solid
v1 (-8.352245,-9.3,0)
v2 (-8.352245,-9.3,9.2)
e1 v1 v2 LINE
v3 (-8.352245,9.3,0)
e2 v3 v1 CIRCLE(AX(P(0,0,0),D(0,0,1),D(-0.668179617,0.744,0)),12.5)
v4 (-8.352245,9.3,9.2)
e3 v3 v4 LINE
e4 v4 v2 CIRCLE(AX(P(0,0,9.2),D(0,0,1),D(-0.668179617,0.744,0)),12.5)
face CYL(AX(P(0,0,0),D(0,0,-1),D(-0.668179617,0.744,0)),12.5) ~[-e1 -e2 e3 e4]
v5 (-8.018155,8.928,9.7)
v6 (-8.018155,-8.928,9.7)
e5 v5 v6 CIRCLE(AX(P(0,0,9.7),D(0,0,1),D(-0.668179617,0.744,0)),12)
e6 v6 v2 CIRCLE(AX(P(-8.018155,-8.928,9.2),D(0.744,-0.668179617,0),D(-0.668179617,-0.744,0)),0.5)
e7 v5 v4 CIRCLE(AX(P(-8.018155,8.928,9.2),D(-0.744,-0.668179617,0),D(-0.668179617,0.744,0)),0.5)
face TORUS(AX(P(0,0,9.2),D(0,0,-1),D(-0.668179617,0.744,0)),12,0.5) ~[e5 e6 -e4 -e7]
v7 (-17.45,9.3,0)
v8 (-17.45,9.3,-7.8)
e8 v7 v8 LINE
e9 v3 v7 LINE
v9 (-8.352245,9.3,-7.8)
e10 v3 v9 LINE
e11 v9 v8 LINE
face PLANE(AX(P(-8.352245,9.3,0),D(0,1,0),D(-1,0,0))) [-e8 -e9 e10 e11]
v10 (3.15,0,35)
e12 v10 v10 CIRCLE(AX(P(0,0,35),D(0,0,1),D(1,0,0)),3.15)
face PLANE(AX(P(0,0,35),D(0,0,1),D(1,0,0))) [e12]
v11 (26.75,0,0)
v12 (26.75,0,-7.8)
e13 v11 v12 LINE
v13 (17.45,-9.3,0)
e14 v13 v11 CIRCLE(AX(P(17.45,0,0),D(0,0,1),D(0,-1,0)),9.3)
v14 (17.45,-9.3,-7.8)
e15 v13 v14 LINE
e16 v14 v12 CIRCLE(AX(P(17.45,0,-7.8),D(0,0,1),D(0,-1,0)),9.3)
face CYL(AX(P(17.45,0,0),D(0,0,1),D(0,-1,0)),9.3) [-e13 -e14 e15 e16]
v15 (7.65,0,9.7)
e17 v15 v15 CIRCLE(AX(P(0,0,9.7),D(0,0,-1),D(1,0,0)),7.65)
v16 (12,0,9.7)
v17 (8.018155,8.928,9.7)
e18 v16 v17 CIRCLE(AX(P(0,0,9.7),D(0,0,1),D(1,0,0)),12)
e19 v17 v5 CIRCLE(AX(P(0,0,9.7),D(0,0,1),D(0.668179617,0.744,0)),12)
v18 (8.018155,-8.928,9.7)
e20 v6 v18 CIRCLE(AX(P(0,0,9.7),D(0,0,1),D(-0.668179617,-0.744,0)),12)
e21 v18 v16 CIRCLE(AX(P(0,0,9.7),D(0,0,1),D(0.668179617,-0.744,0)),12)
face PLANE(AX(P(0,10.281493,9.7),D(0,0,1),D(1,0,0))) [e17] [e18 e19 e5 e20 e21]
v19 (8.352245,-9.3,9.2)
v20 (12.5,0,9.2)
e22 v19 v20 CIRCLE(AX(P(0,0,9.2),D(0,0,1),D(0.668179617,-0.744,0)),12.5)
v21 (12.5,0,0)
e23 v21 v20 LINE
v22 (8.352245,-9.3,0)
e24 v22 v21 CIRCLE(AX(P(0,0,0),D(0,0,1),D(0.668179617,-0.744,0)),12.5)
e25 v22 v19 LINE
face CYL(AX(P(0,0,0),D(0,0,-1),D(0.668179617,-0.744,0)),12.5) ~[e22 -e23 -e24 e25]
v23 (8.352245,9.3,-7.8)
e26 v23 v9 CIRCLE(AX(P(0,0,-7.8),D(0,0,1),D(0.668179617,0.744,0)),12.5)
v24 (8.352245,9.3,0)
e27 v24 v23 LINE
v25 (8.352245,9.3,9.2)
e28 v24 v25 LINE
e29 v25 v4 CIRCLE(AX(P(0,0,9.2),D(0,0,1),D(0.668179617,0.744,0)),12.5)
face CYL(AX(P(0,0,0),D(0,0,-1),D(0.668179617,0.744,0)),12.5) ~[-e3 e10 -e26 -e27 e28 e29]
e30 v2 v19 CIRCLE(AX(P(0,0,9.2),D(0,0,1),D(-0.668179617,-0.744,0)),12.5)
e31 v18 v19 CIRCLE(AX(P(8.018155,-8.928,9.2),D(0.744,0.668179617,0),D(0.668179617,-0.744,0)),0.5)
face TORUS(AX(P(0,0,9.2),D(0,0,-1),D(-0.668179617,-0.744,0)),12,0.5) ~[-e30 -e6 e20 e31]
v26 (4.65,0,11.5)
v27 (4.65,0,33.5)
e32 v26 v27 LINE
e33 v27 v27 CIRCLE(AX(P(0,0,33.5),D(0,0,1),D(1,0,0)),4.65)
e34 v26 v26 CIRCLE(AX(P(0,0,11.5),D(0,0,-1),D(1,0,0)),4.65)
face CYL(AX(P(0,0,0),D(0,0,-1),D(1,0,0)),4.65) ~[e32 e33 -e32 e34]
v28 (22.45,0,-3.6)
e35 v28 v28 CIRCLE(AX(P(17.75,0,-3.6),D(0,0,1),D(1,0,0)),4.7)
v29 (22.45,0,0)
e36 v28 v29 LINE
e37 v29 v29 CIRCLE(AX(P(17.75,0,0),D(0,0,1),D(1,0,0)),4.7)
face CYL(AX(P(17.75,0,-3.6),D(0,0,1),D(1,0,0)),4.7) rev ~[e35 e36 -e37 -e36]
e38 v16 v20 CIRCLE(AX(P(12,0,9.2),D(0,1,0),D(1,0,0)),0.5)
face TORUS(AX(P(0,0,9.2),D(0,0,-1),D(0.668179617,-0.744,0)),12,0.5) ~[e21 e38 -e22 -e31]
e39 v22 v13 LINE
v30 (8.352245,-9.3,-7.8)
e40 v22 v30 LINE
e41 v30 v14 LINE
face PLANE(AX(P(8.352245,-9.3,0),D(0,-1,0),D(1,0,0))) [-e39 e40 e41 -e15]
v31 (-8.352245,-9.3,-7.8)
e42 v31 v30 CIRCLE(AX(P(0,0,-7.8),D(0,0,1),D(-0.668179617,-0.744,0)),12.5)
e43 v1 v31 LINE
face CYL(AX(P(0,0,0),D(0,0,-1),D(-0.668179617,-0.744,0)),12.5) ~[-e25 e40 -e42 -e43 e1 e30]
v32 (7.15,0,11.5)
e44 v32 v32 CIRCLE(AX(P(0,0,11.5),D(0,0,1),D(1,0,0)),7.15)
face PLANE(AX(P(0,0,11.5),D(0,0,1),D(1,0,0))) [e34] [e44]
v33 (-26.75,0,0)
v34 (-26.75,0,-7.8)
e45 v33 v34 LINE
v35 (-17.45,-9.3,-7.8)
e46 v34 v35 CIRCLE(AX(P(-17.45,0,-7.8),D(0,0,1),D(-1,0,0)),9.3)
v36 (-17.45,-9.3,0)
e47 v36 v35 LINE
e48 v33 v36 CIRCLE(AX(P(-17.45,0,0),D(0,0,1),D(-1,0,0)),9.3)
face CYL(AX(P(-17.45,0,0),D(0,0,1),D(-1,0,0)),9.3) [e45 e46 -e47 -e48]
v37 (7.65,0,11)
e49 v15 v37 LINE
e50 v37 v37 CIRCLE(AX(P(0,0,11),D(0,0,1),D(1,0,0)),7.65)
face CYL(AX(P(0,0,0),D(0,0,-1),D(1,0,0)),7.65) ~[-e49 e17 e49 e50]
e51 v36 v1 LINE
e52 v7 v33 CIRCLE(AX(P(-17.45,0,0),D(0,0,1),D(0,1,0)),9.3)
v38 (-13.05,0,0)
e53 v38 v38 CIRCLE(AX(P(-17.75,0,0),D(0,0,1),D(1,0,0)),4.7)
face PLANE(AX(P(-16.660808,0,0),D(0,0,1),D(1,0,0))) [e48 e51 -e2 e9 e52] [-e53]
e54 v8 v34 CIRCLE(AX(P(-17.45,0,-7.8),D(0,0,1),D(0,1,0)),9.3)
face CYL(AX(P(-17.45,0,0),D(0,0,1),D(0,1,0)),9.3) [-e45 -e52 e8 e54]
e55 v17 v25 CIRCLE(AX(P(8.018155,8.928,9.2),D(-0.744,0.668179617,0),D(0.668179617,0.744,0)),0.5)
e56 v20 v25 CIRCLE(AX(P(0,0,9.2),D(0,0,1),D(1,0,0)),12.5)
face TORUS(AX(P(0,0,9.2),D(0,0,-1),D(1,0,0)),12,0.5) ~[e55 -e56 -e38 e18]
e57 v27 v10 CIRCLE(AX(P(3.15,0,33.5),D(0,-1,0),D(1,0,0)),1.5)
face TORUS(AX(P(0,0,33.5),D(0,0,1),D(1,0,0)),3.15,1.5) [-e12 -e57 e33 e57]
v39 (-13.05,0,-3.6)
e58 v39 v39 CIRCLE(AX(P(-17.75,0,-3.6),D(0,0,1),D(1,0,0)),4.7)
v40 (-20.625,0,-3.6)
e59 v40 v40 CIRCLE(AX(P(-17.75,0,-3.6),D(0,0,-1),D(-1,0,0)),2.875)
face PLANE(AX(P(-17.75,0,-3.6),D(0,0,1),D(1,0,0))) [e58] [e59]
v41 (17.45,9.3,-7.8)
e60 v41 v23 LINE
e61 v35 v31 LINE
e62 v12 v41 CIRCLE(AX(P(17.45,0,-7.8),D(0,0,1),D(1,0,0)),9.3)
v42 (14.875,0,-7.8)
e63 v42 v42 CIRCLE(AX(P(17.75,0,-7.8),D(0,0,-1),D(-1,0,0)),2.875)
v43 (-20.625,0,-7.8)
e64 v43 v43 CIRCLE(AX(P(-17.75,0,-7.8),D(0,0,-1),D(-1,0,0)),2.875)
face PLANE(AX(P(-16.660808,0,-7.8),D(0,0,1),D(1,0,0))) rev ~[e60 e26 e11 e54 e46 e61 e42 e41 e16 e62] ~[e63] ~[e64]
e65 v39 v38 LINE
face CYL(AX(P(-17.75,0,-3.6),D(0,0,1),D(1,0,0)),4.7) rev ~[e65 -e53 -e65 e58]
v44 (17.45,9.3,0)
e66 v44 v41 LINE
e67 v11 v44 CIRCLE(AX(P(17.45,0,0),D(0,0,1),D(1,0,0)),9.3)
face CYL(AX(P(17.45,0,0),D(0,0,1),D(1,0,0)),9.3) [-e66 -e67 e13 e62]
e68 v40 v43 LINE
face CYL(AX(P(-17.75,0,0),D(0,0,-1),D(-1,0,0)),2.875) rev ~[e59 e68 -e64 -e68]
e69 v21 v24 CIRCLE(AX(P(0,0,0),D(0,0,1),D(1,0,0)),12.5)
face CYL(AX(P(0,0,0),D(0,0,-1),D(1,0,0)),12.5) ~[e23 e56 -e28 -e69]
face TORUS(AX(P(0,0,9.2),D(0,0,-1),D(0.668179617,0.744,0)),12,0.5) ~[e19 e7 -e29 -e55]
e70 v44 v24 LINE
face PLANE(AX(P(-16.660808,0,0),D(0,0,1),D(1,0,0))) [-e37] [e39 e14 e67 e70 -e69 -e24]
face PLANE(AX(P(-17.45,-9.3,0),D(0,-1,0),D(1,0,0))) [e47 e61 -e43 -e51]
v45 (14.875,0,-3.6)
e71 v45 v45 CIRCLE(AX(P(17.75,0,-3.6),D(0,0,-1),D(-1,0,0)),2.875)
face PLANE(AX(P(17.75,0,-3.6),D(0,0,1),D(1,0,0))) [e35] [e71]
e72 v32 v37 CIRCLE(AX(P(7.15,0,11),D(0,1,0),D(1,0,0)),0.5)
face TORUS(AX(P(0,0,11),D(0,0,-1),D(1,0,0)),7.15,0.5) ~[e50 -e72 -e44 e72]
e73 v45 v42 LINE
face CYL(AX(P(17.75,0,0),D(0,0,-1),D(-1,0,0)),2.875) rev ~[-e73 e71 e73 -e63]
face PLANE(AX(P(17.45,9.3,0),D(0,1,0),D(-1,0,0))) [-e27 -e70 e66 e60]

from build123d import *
from build123d import SkipClean  # not in build123d's __all__

# Parameters (mm, degrees)
F0_R           = 7.65
F0_R_2         = 4.65
F1_DEPTH       = 7.8
F2_DEPTH       = 9.7
F3_DEPTH       = 11.5
F4_DEPTH       = 35
F5_D           = 5.75
F5_CBORE_D     = 9.4
F5_CBORE_DEPTH = 3.6
F6_R           = 0.5
F7_R           = 1.5


# Not quite as in the source:
# - after a boolean that leaves OpenCascade's solid faulty, fix() repairs it


with BuildPart() as f1:
    # F0 (on Top) → F1 (new body)
    with BuildSketch(Plane.XY):
        with BuildLine():
            ThreePointArc((-8.3522452071, -9.3), (-12.5, 0), (-8.3522452071, 9.3))
            Line((-8.3522452071, 9.3), (-17.45, 9.3))
            ThreePointArc((-17.45, 9.3), (-24.026093065, 6.576093065), (-26.75, 0))
            ThreePointArc((-26.75, 0), (-24.026093065, -6.576093065), (-17.45, -9.3))
            Line((-17.45, -9.3), (-8.3522452071, -9.3))
        make_face()
        with BuildLine():
            ThreePointArc((12.5, 0), (11.4160646698, 5.0915093494), (8.3522452071, 9.3))
            Line((8.3522452071, 9.3), (-8.3522452071, 9.3))
            ThreePointArc((-8.3522452071, 9.3), (-12.5, 0), (-8.3522452071, -9.3))
            Line((-8.3522452071, -9.3), (8.3522452071, -9.3))
            ThreePointArc((8.3522452071, -9.3), (11.4160646698, -5.0915093494), (12.5, 0))
        make_face()
        Circle(F0_R, mode=Mode.SUBTRACT)
        Circle(F0_R)
        Circle(F0_R_2, mode=Mode.SUBTRACT)
        Circle(F0_R_2)
        with BuildLine():
            ThreePointArc((26.75, 0), (24.026093065, 6.576093065), (17.45, 9.3))
            Line((17.45, 9.3), (8.3522452071, 9.3))
            ThreePointArc((8.3522452071, 9.3), (11.4160646698, 5.0915093494), (12.5, 0))
            ThreePointArc((12.5, 0), (11.4160646698, -5.0915093494), (8.3522452071, -9.3))
            Line((8.3522452071, -9.3), (17.45, -9.3))
            ThreePointArc((17.45, -9.3), (24.026093065, -6.576093065), (26.75, 0))
        make_face()
        with BuildLine():
            Line((-8.3522452071, 9.3), (8.3522452071, 9.3))
            ThreePointArc((8.3522452071, 9.3), (0, 12.5), (-8.3522452071, 9.3))
        make_face()
        with BuildLine():
            ThreePointArc((-8.3522452071, -9.3), (0, -12.5), (8.3522452071, -9.3))
            Line((8.3522452071, -9.3), (-8.3522452071, -9.3))
        make_face()
    extrude(amount=-F1_DEPTH)

    # F0 (on Top) → F2 (join)
    with BuildSketch(Plane.XY):
        with BuildLine():
            Line((-8.3522452071, 9.3), (8.3522452071, 9.3))
            ThreePointArc((8.3522452071, 9.3), (0, 12.5), (-8.3522452071, 9.3))
        make_face()
        with BuildLine():
            ThreePointArc((-8.3522452071, -9.3), (0, -12.5), (8.3522452071, -9.3))
            Line((8.3522452071, -9.3), (-8.3522452071, -9.3))
        make_face()
        with BuildLine():
            ThreePointArc((12.5, 0), (11.4160646698, 5.0915093494), (8.3522452071, 9.3))
            Line((8.3522452071, 9.3), (-8.3522452071, 9.3))
            ThreePointArc((-8.3522452071, 9.3), (-12.5, 0), (-8.3522452071, -9.3))
            Line((-8.3522452071, -9.3), (8.3522452071, -9.3))
            ThreePointArc((8.3522452071, -9.3), (11.4160646698, -5.0915093494), (12.5, 0))
        make_face()
        Circle(F0_R, mode=Mode.SUBTRACT)
        Circle(F0_R)
        Circle(F0_R_2, mode=Mode.SUBTRACT)
        Circle(F0_R_2)
    with SkipClean():  # cleaning this boolean's faces spoils the solid; the shape is the same uncleaned
        extrude(amount=F2_DEPTH)

    # F0 (on Top) → F3 (join)
    with BuildSketch(Plane.XY):
        Circle(F0_R)
        Circle(F0_R_2, mode=Mode.SUBTRACT)
        Circle(F0_R_2)
    extrude(amount=F3_DEPTH)

    add(f1.part.fix(), mode=Mode.REPLACE)

    # F0 (on Top) → F4 (join)
    with BuildSketch(Plane.XY):
        Circle(F0_R_2)
    extrude(amount=F4_DEPTH)

    # F5 (through all)
    with Locations(Plane.XY):
        with Locations((-17.75, 0), (17.75, 0)):
            CounterBoreHole(F5_D / 2, F5_CBORE_D / 2, F5_CBORE_DEPTH)

    # F6
    f6_edges = [f1.edges().sort_by_distance(p)[0] for p in [
        (8.352245, -9.3, 9.7),
        (-7.65, 0, 11.5),
    ]]
    fillet(f6_edges, radius=F6_R)

    # F7
    f7_edges = [f1.edges().sort_by_distance(p)[0] for p in [
        (-4.65, 0, 35),
    ]]
    fillet(f7_edges, radius=F7_R)


solid = f1.part
